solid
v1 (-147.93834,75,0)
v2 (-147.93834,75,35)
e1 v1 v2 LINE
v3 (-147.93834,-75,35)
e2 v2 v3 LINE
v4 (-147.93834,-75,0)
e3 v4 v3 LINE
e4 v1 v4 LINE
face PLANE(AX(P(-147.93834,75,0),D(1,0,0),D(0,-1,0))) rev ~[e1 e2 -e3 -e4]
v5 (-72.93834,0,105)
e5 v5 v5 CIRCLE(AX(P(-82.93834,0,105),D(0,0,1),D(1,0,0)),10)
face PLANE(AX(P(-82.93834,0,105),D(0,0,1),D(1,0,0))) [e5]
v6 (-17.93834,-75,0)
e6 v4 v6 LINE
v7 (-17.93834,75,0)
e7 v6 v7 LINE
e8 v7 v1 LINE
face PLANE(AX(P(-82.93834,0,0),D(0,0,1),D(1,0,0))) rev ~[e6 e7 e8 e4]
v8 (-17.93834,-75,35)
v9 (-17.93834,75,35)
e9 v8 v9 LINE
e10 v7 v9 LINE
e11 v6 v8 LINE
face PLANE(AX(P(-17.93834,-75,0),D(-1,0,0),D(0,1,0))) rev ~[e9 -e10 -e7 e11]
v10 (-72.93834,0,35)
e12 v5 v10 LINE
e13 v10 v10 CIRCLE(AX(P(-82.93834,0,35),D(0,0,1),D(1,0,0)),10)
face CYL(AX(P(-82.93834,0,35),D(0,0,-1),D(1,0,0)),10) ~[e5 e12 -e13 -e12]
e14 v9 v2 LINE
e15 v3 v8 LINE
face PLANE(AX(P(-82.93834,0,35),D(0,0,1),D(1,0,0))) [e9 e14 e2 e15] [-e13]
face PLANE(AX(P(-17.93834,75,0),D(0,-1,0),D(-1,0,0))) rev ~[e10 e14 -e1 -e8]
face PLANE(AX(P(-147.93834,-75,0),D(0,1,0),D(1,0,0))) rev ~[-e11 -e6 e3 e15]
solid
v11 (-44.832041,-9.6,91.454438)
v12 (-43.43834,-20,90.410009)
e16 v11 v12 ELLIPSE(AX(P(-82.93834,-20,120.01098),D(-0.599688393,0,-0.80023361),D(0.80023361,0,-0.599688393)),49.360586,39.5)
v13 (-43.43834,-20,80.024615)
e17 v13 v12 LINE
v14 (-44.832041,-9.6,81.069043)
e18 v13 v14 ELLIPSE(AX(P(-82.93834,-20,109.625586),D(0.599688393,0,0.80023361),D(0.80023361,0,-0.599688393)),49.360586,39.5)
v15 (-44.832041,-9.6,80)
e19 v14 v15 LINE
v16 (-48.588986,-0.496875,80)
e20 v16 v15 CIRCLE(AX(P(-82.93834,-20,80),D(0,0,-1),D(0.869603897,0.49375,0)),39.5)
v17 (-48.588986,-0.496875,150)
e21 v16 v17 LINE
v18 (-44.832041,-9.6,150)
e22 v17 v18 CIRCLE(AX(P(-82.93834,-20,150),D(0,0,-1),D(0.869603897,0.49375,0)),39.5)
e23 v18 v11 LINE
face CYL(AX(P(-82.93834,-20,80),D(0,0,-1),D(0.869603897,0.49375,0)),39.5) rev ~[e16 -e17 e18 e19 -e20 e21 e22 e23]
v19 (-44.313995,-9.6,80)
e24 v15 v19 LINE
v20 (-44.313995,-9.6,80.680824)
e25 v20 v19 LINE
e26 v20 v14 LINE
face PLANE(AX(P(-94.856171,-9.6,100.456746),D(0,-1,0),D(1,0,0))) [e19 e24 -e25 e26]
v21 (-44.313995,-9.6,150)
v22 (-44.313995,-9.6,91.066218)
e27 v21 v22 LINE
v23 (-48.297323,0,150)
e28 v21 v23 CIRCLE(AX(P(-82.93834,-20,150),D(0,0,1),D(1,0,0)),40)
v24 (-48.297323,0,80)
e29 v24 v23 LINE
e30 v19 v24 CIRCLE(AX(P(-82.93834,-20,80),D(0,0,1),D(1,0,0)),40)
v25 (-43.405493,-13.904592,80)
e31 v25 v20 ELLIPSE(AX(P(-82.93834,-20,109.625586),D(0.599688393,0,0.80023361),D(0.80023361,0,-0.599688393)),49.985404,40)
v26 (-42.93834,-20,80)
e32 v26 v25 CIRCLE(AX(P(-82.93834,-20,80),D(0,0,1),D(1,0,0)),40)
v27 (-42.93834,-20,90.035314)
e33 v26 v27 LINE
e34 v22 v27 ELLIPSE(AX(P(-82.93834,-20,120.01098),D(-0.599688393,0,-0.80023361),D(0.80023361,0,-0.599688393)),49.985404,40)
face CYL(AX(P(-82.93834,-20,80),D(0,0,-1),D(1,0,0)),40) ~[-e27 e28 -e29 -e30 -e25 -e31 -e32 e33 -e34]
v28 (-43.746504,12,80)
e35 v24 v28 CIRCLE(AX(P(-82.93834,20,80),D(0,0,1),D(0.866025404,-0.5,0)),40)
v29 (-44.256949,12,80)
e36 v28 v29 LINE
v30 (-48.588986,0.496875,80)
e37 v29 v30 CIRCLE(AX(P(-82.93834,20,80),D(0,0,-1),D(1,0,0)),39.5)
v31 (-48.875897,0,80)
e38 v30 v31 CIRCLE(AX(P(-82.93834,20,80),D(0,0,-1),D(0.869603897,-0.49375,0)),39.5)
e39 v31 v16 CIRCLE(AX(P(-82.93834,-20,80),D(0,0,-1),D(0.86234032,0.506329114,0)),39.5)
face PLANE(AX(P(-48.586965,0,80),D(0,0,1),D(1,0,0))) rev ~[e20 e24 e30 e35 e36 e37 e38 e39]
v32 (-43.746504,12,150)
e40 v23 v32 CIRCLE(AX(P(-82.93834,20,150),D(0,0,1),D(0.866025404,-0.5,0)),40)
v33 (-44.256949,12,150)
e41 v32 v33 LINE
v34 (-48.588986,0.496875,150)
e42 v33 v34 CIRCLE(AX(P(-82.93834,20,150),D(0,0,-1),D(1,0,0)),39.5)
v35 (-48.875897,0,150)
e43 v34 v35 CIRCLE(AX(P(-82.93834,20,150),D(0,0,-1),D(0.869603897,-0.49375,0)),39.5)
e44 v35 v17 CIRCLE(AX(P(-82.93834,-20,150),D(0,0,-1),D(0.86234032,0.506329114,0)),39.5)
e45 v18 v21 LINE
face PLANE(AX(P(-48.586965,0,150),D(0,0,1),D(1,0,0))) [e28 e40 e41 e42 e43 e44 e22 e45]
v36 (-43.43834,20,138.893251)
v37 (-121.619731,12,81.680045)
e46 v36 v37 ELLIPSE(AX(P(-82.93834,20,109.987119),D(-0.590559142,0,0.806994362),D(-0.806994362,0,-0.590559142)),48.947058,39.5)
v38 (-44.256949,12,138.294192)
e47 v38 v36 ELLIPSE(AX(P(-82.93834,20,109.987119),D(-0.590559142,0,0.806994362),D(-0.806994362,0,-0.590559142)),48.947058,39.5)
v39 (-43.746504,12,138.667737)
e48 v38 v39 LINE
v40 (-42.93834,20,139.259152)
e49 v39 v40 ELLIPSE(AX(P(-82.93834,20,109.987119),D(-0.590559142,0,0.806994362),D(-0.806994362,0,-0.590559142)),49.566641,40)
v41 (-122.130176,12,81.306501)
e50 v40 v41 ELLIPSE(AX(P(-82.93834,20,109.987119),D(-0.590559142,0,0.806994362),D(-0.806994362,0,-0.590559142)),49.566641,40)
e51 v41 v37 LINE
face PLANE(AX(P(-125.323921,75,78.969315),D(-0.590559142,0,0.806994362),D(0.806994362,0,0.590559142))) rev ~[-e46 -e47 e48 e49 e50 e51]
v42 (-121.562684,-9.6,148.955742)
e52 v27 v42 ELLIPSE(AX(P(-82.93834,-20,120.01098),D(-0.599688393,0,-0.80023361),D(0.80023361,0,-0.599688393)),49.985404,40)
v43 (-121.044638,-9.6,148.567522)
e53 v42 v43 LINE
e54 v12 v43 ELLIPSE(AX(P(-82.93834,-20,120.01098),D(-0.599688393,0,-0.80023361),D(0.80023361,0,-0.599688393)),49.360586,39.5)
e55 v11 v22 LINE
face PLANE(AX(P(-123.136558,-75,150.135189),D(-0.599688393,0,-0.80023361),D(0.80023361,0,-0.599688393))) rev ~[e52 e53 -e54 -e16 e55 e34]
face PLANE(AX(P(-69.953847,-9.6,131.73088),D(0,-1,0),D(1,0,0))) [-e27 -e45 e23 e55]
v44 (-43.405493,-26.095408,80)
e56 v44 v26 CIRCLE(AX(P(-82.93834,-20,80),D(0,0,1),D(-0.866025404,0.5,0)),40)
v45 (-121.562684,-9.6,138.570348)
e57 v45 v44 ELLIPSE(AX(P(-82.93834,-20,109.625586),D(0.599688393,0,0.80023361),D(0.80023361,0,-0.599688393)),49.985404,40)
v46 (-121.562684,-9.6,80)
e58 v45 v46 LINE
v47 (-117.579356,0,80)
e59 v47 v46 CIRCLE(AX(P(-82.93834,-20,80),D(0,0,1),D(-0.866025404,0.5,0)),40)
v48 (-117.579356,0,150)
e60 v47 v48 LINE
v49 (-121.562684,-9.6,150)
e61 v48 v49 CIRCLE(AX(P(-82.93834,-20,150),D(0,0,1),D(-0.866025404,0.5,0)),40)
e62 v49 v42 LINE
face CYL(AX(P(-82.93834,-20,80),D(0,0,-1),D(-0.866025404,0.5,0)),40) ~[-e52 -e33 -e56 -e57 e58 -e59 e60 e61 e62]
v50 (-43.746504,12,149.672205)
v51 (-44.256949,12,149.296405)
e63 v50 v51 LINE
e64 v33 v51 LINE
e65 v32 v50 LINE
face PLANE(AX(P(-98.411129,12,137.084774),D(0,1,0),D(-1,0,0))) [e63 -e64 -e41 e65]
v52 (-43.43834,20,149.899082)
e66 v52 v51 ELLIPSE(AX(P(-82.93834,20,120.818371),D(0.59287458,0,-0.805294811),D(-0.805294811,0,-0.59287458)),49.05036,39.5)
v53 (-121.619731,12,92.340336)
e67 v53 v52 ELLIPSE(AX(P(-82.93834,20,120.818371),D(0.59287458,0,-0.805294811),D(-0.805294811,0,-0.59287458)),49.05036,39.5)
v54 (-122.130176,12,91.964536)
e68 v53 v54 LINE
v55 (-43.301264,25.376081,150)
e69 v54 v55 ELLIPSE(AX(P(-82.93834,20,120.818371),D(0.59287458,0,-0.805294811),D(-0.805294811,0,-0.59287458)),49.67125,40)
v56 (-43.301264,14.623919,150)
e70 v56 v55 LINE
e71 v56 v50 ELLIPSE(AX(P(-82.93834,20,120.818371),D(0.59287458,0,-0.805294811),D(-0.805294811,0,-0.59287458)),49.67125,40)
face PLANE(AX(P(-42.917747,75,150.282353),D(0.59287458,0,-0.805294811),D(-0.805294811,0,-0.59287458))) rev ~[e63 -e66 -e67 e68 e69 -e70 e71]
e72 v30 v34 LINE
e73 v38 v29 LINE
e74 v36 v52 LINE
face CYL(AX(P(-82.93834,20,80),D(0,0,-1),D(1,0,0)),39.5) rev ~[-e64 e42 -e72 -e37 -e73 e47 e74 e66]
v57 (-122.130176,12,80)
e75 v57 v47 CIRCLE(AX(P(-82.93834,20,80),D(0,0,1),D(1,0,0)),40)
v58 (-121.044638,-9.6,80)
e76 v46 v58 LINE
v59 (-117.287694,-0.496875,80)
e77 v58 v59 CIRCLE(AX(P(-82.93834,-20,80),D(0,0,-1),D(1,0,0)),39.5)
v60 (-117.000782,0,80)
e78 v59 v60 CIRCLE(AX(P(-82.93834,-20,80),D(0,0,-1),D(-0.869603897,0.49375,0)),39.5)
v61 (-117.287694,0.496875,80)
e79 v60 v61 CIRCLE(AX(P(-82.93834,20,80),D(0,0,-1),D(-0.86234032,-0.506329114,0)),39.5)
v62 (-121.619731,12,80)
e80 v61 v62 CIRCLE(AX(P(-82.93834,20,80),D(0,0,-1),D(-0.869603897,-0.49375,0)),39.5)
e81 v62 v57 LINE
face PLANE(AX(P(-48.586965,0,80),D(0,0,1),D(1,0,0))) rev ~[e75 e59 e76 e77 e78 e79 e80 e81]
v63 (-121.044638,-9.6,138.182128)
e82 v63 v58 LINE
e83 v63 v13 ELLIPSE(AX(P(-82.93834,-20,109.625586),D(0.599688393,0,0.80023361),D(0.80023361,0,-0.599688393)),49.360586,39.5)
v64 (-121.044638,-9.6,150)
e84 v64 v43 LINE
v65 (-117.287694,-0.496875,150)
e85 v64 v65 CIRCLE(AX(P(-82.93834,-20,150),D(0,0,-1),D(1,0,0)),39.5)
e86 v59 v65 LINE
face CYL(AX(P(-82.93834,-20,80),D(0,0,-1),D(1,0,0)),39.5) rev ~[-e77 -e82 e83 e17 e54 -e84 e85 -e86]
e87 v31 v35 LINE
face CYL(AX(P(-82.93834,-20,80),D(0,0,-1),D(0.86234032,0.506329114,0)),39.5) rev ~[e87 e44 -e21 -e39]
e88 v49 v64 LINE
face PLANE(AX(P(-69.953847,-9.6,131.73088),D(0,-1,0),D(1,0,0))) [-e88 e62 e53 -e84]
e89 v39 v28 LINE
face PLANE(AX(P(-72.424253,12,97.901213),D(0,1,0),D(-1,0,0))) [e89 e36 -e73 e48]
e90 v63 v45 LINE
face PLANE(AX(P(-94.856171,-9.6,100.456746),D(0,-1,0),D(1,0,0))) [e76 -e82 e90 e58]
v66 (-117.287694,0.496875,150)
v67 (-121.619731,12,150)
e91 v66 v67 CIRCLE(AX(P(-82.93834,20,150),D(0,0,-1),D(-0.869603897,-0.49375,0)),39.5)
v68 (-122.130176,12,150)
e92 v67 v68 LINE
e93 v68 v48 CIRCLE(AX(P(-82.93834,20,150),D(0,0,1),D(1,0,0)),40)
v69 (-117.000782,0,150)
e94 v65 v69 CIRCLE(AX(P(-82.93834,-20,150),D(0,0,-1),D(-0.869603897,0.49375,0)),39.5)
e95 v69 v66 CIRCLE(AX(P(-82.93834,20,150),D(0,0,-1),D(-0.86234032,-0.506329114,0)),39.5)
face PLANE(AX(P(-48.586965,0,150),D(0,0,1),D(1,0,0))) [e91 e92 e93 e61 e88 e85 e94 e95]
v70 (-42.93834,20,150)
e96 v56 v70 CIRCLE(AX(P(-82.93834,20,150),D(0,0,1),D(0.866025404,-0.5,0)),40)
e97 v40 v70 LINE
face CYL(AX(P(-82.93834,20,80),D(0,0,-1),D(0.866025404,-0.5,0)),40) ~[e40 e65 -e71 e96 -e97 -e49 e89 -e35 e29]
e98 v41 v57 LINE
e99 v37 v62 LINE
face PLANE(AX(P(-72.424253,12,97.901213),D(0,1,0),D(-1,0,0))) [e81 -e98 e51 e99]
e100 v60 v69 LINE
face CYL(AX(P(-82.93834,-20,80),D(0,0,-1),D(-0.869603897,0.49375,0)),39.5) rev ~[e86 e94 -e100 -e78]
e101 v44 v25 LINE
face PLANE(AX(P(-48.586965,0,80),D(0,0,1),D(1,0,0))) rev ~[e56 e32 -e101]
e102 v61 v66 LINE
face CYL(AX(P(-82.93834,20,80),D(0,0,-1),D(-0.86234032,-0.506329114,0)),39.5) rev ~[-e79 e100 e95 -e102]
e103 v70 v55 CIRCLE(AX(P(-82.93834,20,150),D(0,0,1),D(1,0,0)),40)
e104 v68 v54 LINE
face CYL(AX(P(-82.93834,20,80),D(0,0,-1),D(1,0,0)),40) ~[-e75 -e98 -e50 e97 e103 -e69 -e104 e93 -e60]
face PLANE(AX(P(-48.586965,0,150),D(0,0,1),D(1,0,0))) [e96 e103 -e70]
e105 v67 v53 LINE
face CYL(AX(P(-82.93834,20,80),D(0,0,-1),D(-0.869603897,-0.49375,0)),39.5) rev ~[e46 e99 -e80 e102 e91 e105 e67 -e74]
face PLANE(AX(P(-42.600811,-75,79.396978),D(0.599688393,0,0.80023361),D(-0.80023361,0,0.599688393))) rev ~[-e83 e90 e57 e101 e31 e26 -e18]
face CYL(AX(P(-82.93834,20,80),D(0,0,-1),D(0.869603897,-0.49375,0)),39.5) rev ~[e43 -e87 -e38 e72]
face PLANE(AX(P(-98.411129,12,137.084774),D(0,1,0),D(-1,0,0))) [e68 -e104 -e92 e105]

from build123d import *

# Parameters (mm, degrees)
F1_DEPTH = 35
F2_R     = 10
F3_DEPTH = 45
F5_DEPTH = 70
F7_DEPTH = 63
F9_DEPTH = 65.4


with BuildPart() as f1:
    # F0 (on Top) → F1 (new body)
    with BuildSketch(Plane.XY):
        Polygon((-147.9383396478, 75), (-147.9383396478, 0), (-147.9383396478, -75), (-17.9383396478, -75), (-17.9383396478, 0), (-17.9383396478, 75), align=None)
    extrude(amount=F1_DEPTH)

    # F2 (on face) → F3 (join)
    with BuildSketch(Plane.XY.offset(35)):
        with Locations((-82.9383396478, 0)):
            Circle(F2_R)
    extrude(amount=F3_DEPTH)

    # F2 (on face) → F5, piece 2 (join)
    with BuildSketch(Plane.XY.offset(35)):
        with Locations((-82.9383396478, 0)):
            Circle(F2_R)
    extrude(amount=F5_DEPTH)


with BuildPart() as f5:
    # F4 (on face) → F5 (new body)
    with BuildSketch(Plane.XY.offset(80)):
        with BuildLine():
            ThreePointArc((-48.5889857203, 0.496875), (-48.7315391647, 0.2479165476), (-48.8758969873, 0))
            ThreePointArc((-48.8758969873, 0), (-48.7315391647, -0.2479165476), (-48.5889857203, -0.496875))
            ThreePointArc((-48.5889857203, -0.496875), (-48.4422599851, -0.2489626377), (-48.2973234964, 0))
            ThreePointArc((-48.2973234964, 0), (-48.4422599851, 0.2489626377), (-48.5889857203, 0.496875))
        make_face()
        with BuildLine():
            ThreePointArc((-117.2876935753, -0.496875), (-117.1451401309, -0.2479165476), (-117.0007823083, 0))
            ThreePointArc((-117.0007823083, 0), (-117.1451401309, 0.2479165476), (-117.2876935753, 0.496875))
            ThreePointArc((-117.2876935753, 0.496875), (-117.4344193105, 0.2489626377), (-117.5793557992, 0))
            ThreePointArc((-117.5793557992, 0), (-117.4344193105, -0.2489626377), (-117.2876935753, -0.496875))
        make_face()
        with BuildLine():
            ThreePointArc((-43.4383396478, 20), (-44.7477028363, 9.9141058933), (-48.5889857203, 0.496875))
            ThreePointArc((-48.5889857203, 0.496875), (-48.4422599851, 0.2489626377), (-48.2973234964, 0))
            ThreePointArc((-48.2973234964, 0), (-44.3013065963, 9.6472381959), (-42.9383396478, 20))
            ThreePointArc((-42.9383396478, 20), (-93.2911014519, 58.6370330516), (-117.5793557992, 0))
            ThreePointArc((-117.5793557992, 0), (-117.4344193105, 0.2489626377), (-117.2876935753, 0.496875))
            ThreePointArc((-117.2876935753, 0.496875), (-93.0242337546, 58.1906368115), (-43.4383396478, 20))
        make_face()
        with BuildLine():
            ThreePointArc((-48.2973234964, 0), (-48.4422599851, -0.2489626377), (-48.5889857203, -0.496875))
            ThreePointArc((-48.5889857203, -0.496875), (-44.7477028363, -9.9141058933), (-43.4383396478, -20))
            ThreePointArc((-43.4383396478, -20), (-93.0242337546, -58.1906368115), (-117.2876935753, -0.496875))
            ThreePointArc((-117.2876935753, -0.496875), (-117.4344193105, -0.2489626377), (-117.5793557992, 0))
            ThreePointArc((-117.5793557992, 0), (-93.2911014519, -58.6370330516), (-42.9383396478, -20))
            ThreePointArc((-42.9383396478, -20), (-44.3013065963, -9.6472381959), (-48.2973234964, 0))
        make_face()
    extrude(amount=F5_DEPTH)

    # F6 (on face) → F7 (cut)
    with BuildSketch(Plane(origin=(0, 75, 0), x_dir=(-1, 0, 0), z_dir=(0, 1, 0))):
        Polygon((39.7482812405, 157.8890830278), (42.9177470505, 150.2823531628), (123.4222427011, 91.013289988), (145.2915817499, 160.4246497154), align=None)
        Polygon((125.323921442, 78.9693146944), (42.6008030772, 139.5061612129), (35.6279686093, 78.9693146944), (96.798710525, 78.9693146944), (115.498572588, 72.6303756237), align=None)
    extrude(amount=-F7_DEPTH, mode=Mode.SUBTRACT)

    # F8 (on face) → F9 (cut)
    with BuildSketch(Plane.XZ.offset(75)):
        Polygon((-33.7830297649, 154.05420959), (-123.1365576386, 150.1351892948), (-42.6008105278, 89.782372117), align=None)
        Polygon((-126.3355825414, 79.9848362803), (-42.6008105278, 79.3969780207), (-126.3355825414, 142.1471177791), align=None)
    extrude(amount=-F9_DEPTH, mode=Mode.SUBTRACT)


solid = Compound([f1.part, f5.part])
